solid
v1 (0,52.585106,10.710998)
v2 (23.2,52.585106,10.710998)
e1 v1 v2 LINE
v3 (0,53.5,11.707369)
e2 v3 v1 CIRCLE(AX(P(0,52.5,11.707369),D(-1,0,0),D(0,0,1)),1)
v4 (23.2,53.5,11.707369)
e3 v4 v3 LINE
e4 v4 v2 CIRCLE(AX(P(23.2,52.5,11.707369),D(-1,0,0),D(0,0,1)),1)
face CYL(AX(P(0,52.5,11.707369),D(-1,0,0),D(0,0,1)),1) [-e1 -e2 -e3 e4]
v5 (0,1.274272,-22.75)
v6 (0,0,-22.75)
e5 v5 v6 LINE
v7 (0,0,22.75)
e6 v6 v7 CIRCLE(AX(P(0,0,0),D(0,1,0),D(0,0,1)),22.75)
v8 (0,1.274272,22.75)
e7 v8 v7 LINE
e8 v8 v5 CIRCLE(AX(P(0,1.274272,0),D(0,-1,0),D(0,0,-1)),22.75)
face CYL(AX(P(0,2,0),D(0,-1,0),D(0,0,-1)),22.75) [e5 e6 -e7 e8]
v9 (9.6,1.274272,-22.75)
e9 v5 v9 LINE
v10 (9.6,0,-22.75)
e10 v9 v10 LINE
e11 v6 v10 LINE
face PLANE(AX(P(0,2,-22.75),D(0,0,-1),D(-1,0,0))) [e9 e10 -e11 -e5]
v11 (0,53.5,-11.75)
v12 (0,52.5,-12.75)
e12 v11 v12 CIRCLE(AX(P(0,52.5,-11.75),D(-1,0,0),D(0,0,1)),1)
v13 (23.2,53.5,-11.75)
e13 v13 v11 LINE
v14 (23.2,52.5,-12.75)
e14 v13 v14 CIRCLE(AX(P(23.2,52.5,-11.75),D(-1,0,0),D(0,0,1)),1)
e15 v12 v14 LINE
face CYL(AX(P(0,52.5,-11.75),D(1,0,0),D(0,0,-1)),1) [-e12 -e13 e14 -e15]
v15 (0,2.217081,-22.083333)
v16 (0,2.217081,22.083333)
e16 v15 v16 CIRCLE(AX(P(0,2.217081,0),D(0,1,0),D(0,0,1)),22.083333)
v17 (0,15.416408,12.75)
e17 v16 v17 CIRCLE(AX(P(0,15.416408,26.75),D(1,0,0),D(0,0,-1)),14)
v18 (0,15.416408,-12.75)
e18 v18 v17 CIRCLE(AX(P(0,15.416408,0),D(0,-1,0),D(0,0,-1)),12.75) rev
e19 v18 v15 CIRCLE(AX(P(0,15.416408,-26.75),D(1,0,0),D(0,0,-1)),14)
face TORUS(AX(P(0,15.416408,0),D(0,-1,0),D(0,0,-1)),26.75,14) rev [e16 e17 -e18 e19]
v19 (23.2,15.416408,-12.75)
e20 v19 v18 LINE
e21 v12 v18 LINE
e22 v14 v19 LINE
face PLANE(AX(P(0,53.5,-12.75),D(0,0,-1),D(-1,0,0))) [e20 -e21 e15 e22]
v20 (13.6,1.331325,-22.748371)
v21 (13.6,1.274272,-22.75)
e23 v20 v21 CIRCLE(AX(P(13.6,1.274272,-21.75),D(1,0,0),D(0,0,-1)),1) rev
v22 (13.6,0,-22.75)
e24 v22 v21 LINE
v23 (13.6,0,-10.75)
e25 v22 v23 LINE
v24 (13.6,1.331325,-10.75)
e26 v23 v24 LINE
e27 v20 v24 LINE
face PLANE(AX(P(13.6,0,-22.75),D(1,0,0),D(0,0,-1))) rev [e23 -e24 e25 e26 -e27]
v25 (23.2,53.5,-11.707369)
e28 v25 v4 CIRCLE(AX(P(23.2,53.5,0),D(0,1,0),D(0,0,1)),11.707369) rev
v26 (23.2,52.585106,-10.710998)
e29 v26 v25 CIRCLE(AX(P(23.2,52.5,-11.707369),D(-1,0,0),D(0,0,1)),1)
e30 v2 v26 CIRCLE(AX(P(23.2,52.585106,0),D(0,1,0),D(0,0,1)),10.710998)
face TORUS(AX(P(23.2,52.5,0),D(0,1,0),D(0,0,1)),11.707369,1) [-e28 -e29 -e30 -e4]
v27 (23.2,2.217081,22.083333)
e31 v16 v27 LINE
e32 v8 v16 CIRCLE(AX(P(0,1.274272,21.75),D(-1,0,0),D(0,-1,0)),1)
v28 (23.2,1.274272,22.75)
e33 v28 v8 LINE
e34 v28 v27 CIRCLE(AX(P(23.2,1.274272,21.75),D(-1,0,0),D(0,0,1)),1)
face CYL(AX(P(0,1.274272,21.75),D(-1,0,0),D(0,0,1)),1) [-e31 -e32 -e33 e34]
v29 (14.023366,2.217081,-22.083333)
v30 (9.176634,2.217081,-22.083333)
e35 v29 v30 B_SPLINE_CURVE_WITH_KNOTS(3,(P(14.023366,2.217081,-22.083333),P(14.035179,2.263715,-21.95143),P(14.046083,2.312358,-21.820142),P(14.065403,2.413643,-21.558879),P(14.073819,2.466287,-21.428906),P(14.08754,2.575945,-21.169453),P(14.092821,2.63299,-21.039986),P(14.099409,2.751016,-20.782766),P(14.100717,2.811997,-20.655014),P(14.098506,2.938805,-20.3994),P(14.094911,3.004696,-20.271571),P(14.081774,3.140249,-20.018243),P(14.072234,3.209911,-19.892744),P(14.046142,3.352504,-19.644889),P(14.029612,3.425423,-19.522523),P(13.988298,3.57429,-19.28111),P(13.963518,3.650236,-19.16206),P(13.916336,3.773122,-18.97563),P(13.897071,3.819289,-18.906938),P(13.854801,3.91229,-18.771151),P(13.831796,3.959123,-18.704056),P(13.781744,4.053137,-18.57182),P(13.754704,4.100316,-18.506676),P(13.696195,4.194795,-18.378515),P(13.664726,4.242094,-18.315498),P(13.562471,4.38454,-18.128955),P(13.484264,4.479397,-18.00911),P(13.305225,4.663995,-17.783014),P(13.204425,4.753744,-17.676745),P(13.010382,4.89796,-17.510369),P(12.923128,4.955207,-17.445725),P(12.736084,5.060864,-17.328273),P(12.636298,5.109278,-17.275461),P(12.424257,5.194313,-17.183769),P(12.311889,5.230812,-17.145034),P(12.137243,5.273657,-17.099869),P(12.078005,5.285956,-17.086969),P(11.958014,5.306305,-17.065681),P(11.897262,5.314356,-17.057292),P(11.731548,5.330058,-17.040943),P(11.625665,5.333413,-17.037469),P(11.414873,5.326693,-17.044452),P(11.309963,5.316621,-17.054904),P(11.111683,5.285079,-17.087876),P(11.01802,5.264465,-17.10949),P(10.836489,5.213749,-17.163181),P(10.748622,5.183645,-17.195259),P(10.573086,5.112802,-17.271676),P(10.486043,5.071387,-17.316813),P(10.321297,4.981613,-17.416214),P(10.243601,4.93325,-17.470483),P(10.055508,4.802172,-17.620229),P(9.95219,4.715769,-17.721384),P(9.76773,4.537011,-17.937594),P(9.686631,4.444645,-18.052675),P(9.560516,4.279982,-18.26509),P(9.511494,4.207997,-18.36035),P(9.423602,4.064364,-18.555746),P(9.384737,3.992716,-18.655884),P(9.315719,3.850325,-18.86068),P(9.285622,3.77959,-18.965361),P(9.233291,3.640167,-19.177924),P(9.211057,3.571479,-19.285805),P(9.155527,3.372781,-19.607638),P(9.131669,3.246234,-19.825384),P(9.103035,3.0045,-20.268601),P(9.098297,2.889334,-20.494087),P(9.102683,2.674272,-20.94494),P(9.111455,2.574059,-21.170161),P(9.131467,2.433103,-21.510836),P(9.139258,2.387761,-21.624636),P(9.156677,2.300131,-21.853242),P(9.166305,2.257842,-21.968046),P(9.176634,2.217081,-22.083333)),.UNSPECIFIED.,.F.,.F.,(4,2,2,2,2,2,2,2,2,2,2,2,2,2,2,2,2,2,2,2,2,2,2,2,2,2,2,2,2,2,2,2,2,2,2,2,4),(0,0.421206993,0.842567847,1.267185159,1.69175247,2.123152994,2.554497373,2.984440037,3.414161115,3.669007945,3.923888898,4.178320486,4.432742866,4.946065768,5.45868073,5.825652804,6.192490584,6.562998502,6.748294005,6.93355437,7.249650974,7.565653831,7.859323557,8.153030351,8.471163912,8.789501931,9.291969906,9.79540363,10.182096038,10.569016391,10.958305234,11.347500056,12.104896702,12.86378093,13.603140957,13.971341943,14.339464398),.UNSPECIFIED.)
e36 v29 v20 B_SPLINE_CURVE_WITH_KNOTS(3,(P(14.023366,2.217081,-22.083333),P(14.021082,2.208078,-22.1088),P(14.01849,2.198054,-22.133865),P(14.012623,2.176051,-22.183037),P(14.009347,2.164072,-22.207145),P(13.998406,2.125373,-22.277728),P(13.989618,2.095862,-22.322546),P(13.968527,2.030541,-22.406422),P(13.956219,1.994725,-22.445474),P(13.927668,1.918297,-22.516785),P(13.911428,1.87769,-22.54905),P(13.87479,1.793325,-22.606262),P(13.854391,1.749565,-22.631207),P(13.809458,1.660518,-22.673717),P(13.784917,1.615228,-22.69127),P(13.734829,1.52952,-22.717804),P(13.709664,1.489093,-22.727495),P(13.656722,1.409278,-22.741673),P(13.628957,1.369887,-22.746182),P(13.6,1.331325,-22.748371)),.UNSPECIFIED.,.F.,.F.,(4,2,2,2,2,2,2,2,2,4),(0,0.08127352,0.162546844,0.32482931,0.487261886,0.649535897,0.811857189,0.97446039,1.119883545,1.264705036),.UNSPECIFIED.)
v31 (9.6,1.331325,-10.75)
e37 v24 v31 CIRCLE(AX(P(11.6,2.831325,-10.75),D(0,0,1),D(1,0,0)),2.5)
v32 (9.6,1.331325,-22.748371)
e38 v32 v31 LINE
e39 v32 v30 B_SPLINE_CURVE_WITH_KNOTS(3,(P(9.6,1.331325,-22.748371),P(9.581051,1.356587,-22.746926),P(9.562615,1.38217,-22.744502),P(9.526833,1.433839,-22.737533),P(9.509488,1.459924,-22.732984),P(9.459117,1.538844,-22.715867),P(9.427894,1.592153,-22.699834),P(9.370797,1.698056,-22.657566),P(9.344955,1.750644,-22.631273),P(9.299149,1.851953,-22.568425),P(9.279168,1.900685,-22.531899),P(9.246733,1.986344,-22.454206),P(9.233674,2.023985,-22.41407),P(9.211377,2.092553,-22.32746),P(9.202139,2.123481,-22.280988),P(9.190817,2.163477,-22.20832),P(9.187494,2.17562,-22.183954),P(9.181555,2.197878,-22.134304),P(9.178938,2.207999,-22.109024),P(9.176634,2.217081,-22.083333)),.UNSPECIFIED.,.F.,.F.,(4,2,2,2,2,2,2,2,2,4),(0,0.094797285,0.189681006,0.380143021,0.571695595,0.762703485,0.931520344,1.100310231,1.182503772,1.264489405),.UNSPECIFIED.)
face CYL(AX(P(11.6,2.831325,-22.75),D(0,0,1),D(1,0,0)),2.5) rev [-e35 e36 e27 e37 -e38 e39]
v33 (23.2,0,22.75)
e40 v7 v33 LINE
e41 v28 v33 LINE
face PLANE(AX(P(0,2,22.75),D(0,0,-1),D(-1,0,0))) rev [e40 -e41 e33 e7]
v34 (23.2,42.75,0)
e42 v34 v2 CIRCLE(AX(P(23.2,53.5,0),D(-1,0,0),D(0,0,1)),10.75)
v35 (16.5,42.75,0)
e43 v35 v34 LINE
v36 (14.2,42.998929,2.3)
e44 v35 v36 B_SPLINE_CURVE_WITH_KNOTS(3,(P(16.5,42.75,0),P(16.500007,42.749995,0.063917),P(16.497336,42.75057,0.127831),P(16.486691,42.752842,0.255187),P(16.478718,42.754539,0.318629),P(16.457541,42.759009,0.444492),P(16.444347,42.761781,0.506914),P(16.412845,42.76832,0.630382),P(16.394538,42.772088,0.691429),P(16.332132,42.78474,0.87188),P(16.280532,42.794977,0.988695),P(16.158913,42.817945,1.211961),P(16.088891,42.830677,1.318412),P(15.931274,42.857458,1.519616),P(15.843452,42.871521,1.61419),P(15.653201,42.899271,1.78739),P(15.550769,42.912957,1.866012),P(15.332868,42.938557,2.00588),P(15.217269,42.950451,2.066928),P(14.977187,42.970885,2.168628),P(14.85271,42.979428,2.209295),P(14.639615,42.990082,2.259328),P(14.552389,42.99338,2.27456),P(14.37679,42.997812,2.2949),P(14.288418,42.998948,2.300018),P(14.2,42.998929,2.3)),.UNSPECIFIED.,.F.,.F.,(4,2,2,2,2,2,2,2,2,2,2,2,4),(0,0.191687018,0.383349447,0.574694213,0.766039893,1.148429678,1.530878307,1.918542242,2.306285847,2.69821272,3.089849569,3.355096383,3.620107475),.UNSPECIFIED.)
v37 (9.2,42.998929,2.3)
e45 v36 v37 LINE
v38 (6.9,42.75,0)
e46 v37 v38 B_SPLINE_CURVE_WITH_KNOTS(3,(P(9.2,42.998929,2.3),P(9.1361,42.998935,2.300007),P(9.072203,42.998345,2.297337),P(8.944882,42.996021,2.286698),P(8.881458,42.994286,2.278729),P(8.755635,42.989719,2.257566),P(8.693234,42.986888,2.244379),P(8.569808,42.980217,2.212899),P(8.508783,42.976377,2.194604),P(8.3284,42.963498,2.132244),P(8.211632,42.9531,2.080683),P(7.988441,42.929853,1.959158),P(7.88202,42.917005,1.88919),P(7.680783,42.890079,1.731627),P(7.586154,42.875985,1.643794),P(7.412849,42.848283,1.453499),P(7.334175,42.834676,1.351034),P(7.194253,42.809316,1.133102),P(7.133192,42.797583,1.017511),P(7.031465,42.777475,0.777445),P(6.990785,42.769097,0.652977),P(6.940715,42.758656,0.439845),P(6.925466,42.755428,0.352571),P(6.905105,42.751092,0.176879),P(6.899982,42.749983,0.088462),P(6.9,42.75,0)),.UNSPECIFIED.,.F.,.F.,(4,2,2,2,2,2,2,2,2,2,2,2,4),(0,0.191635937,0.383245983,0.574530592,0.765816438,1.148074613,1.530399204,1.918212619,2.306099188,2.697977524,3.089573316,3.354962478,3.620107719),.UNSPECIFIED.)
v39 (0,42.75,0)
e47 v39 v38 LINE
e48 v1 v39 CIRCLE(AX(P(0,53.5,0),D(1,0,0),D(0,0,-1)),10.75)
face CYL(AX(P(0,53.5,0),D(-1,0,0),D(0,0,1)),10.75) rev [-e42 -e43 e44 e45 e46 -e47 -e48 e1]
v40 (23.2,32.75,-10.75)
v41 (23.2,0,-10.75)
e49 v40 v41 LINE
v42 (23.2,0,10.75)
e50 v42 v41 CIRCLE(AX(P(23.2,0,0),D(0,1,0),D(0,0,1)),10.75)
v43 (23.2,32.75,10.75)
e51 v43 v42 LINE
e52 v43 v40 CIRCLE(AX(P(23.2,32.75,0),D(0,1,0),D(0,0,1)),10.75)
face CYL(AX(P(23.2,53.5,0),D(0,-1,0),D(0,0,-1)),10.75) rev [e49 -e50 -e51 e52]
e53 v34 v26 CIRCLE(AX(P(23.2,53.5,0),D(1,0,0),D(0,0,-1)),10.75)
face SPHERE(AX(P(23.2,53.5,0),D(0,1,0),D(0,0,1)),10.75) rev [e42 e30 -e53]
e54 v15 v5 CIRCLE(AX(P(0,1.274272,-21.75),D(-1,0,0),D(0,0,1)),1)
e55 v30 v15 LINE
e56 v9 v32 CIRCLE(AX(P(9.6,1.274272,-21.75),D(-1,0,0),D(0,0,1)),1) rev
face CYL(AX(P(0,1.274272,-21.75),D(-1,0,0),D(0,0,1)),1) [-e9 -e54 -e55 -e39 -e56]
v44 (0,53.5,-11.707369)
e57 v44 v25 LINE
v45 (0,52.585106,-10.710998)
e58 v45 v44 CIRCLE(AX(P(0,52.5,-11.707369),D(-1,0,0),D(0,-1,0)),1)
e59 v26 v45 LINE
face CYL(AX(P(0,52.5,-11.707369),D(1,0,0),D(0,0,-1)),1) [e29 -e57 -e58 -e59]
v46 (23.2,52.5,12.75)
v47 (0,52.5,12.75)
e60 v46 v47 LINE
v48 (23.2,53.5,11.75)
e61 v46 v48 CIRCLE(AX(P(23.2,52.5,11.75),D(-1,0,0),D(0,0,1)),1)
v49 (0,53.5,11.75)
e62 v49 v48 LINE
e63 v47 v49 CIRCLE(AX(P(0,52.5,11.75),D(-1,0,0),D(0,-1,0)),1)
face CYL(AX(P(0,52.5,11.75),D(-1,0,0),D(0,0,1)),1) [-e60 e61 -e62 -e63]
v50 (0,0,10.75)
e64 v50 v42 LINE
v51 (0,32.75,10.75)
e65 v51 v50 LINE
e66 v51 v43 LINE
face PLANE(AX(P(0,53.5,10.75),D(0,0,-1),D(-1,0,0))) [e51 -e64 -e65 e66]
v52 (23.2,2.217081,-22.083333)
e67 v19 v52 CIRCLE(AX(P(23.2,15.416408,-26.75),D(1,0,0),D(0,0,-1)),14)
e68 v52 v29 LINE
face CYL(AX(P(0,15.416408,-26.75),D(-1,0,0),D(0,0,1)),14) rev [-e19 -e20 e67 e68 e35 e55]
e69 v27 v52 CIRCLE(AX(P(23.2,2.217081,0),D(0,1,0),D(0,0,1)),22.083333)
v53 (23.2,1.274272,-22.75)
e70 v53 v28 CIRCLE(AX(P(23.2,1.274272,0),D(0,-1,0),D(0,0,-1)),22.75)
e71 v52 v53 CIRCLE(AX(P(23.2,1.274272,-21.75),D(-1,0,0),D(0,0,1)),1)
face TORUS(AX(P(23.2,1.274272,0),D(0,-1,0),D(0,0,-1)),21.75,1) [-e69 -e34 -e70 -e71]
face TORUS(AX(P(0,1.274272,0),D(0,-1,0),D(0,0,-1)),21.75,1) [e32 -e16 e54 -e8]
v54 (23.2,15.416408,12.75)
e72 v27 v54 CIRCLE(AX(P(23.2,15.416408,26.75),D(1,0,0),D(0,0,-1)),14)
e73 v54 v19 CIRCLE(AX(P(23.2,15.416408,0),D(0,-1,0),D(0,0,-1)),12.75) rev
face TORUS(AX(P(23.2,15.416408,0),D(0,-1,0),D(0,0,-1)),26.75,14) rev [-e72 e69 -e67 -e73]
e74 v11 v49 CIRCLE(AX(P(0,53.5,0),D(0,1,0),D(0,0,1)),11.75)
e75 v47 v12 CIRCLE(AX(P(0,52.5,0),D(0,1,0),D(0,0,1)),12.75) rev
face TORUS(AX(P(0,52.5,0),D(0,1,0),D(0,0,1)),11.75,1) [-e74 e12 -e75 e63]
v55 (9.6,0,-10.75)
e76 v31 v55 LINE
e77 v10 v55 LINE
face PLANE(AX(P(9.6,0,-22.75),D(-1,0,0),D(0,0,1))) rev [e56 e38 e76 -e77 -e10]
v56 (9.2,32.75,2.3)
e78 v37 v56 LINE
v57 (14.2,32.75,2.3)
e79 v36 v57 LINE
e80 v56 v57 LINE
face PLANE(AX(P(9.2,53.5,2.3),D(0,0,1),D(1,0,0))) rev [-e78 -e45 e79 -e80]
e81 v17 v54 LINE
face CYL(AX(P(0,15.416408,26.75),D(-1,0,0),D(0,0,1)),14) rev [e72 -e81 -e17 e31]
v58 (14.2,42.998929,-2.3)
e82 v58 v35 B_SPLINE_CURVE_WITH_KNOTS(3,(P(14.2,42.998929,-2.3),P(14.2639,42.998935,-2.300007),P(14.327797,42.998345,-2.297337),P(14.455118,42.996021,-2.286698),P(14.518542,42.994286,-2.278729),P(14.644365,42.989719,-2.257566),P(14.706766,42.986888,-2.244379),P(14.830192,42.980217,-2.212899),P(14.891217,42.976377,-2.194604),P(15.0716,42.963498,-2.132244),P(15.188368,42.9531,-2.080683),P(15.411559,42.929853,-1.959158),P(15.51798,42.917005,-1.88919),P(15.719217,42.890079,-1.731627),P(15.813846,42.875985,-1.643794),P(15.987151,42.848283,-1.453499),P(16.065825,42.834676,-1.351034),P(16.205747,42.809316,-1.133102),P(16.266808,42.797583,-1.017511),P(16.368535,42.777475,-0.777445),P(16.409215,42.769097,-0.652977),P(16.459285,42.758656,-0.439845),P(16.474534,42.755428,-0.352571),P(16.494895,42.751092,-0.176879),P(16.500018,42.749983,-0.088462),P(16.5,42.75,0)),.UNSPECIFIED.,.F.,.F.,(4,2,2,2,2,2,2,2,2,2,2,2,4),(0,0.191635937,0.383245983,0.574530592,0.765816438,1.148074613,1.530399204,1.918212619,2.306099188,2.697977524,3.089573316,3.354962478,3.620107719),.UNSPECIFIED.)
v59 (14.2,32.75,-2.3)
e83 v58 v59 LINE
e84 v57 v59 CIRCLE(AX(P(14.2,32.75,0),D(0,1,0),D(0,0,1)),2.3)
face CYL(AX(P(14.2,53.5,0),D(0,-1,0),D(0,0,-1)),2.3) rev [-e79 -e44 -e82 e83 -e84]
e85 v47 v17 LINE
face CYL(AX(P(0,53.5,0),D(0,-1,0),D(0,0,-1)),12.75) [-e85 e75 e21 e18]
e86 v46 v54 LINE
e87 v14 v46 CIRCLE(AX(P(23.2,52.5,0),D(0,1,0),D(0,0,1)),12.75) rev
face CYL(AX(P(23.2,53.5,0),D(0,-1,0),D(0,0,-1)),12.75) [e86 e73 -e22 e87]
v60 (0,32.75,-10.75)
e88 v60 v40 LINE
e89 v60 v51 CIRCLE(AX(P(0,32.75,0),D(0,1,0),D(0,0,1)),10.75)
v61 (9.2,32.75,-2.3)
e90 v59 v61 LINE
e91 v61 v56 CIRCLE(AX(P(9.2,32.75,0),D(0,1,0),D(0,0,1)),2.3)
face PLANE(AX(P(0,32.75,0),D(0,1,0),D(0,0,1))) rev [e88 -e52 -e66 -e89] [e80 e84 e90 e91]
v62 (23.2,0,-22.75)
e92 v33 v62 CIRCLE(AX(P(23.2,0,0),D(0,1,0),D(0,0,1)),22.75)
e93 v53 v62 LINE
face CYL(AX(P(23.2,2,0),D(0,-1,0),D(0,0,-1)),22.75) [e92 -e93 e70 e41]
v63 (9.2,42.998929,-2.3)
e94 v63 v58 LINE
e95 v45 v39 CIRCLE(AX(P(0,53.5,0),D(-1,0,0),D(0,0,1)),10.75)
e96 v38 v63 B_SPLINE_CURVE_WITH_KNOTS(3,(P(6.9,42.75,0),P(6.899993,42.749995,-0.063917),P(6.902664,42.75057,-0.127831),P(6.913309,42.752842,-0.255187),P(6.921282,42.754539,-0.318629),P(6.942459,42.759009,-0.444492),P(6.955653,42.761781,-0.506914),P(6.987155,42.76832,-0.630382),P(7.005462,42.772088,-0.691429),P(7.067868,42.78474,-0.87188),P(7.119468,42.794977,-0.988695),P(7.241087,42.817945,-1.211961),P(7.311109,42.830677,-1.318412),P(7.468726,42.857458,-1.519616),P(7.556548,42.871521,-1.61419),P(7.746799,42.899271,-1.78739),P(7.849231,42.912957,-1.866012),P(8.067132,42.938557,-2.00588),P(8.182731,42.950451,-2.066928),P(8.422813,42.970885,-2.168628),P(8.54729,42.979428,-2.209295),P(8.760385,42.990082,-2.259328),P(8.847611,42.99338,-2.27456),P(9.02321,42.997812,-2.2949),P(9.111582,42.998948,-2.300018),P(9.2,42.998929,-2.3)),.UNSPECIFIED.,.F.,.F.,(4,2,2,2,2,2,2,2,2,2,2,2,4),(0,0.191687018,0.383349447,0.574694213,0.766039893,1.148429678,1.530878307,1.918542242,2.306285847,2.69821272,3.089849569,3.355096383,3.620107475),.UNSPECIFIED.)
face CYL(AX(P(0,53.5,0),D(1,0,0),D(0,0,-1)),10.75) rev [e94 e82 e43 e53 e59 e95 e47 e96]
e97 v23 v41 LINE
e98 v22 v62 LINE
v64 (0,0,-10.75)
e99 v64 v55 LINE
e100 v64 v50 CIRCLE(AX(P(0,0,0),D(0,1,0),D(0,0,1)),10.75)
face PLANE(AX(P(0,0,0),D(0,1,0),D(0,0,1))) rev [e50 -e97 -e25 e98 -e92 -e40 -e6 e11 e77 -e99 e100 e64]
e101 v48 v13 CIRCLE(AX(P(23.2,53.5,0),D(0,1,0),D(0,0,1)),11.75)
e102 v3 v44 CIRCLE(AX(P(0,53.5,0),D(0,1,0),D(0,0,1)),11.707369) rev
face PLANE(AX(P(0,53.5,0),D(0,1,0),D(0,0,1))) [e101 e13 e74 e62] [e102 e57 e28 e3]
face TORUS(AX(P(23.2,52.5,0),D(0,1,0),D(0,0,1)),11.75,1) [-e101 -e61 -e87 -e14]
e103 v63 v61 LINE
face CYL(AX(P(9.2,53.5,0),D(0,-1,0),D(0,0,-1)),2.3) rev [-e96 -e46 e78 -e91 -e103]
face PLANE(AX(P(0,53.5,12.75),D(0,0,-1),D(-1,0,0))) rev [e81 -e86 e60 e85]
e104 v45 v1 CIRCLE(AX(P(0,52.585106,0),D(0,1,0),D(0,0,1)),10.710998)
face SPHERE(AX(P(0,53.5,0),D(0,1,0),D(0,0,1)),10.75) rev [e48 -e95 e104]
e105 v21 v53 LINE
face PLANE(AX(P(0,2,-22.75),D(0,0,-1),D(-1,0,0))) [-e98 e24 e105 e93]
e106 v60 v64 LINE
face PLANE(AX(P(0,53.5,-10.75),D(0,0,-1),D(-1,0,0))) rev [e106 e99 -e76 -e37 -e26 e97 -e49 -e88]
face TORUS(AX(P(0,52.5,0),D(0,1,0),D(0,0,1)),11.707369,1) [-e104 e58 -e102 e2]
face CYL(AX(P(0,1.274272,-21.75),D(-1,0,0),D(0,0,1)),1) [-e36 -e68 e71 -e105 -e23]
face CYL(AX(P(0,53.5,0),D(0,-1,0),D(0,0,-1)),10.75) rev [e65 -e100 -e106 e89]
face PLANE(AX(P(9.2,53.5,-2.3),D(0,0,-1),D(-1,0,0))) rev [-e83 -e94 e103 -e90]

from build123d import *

# Parameters (mm, degrees)
BOSS_EXTRUDE1_DEPTH     = 53.5
BOSS_EXTRUDE2_START     = 32.75
BOSS_EXTRUDE2_DEPTH     = 10
BOSS_EXTRUDE3_DEPTH     = 2
FILLET1_R               = 10.75
FILLET2_R               = 14
FILLET3_R               = 1
CUT_EXTRUDE4_DEPTH      = 79.076260797
CUT_EXTRUDE5_DEPTH      = 61.840180017
CUT_EXTRUDE5_DEPTH_BACK = 61.840180017


# Some blends are built 0.0001 mm under size
with BuildPart() as part:
    # Sketch2 → Boss-Extrude1 (new body)
    with BuildSketch(Plane(origin=(0, 0, 0), x_dir=(1, 0, 0), z_dir=(0, 1, 0))):
        with BuildLine():
            Line((0, -12.75), (23.2, -12.75))
            ThreePointArc((23.2, -12.75), (35.95, 0), (23.2, 12.75))
            Line((23.2, 12.75), (0, 12.75))
            ThreePointArc((0, 12.75), (-12.75, 0), (0, -12.75))
        make_face()
        with BuildLine():
            ThreePointArc((23.2, -10.75), (33.95, 0), (23.2, 10.75))
            Line((23.2, 10.75), (0, 10.75))
            ThreePointArc((0, 10.75), (-10.75, 0), (0, -10.75))
            Line((0, -10.75), (23.2, -10.75))
        make_face(mode=Mode.SUBTRACT)
    extrude(amount=BOSS_EXTRUDE1_DEPTH)

    # Sketch2<3> → Boss-Extrude2 (add)
    with BuildSketch(Plane(origin=(0, 0, 0), x_dir=(1, 0, 0), z_dir=(0, 1, 0)).offset(BOSS_EXTRUDE2_START)):
        with BuildLine():
            Line((0, -10.75), (23.2, -10.75))
            ThreePointArc((23.2, -10.75), (33.95, 0), (23.2, 10.75))
            Line((23.2, 10.75), (0, 10.75))
            ThreePointArc((0, 10.75), (-10.75, 0), (0, -10.75))
        make_face()
    extrude(amount=BOSS_EXTRUDE2_DEPTH)

    # Sketch2<4> → Boss-Extrude3 (add)
    with BuildSketch(Plane(origin=(0, 0, 0), x_dir=(1, 0, 0), z_dir=(0, 1, 0))):
        with BuildLine():
            Line((0, 22.75), (23.2, 22.75))
            ThreePointArc((23.2, 22.75), (45.95, 0), (23.2, -22.75))
            Line((23.2, -22.75), (0, -22.75))
            ThreePointArc((0, -22.75), (-22.75, 0), (0, 22.75))
        make_face()
        with BuildLine():
            ThreePointArc((23.2, -12.75), (35.95, 0), (23.2, 12.75))
            Line((23.2, 12.75), (0, 12.75))
            ThreePointArc((0, 12.75), (-12.75, 0), (0, -12.75))
            Line((0, -12.75), (23.2, -12.75))
        make_face(mode=Mode.SUBTRACT)
    extrude(amount=BOSS_EXTRUDE3_DEPTH)

    # Fillet1
    fillet1_edges = [part.edges().sort_by_distance(p)[0] for p in [
        (11.6, 42.75, -10.75),
        (33.95, 42.75, 0),
        (11.6, 42.75, 10.75),
        (-10.75, 42.75, 0),
    ]]
    fillet(fillet1_edges, radius=FILLET1_R - 0.0001)  # a hair under: the kernel refuses the full size

    # Fillet2
    # the kernel refuses this fillet: 14 mm, written as the material it adds along each edge
    with BuildSketch(Plane(origin=(23.2, 2, 0), x_dir=(0, 0, 1), z_dir=(-1, 0, 0))) as fillet2_piece_1:
        with BuildLine():
            CenterArc((26.75, 13.416407865), FILLET2_R, 180, 73.398450401)
            Line((22.75, 0), (22.67, -0.268328157))
            ThreePointArc((22.67, -0.268328157), (17.75, -0.28), (12.75, -0.28))
            Line((12.75, -0.28), (12.47, 0))
            Line((12.47, 0), (12.47, 13.416407865))
            Line((12.47, 13.416407865), (12.75, 13.416407865))
        make_face()
    revolve(axis=Axis((23.2, 2, 0), (0, 1, 0)), revolution_arc=180)
    with BuildSketch(Plane(origin=(0, 2, 12.75), x_dir=(0, 1, 0), z_dir=(1, 0, 0)), Plane(origin=(23.2, 2, -12.75), x_dir=(0, 1, 0), z_dir=(-1, 0, 0))) as fillet2_piece_2:
        with BuildLine():
            CenterArc((13.416407865, 14), FILLET2_R, 196.601549599, 73.398450401)
            Line((0, 10), (-0.268328157, 9.92))
            ThreePointArc((-0.268328157, 9.92), (-0.28, 5), (-0.28, 0))
            Line((-0.28, 0), (0, -0.28))
            Line((0, -0.28), (13.416407865, -0.28))
            Line((13.416407865, -0.28), (13.416407865, 0))
        make_face()
    extrude(amount=23.2)
    with BuildSketch(Plane(origin=(0, 2, 0), x_dir=(0, 0, -1), z_dir=(1, 0, 0))) as fillet2_piece_3:
        with BuildLine():
            CenterArc((26.75, 13.416407865), FILLET2_R, 180, 73.398450401)
            Line((22.75, 0), (22.67, -0.268328157))
            ThreePointArc((22.67, -0.268328157), (17.75, -0.28), (12.75, -0.28))
            Line((12.75, -0.28), (12.47, 0))
            Line((12.47, 0), (12.47, 13.416407865))
            Line((12.47, 13.416407865), (12.75, 13.416407865))
        make_face()
    revolve(axis=Axis((0, 2, 0), (0, 1, 0)), revolution_arc=180)

    # Fillet3
    # the kernel refuses this fillet: 1 mm, written as the material it takes off along each edge
    with BuildSketch(Plane(origin=(0, 53.5, 10.75), x_dir=(0, 0, 1), z_dir=(1, 0, 0)), Plane(origin=(23.2, 53.5, -10.75), x_dir=(0, 0, -1), z_dir=(-1, 0, 0))) as fillet3_piece_1:
        with BuildLine():
            CenterArc((0.957377651, 1), FILLET3_R, 184.881694581, 85.118305419)
            Line((-0.038994884, 0.914901403), (-0.138632138, 0.906391544))
            ThreePointArc((-0.138632138, 0.906391544), (-0.1, 0.0001), (-0.1, 0))
            Line((-0.1, 0), (0, -0.1))
            Line((0, -0.1), (0.957377651, -0.1))
            Line((0.957377651, -0.1), (0.957377651, 0))
        make_face()
    extrude(amount=23.2, mode=Mode.SUBTRACT)
    with BuildSketch(Plane(origin=(0, 53.5, 0), x_dir=(0, 0, -1), z_dir=(1, 0, 0))) as fillet3_piece_2:
        with BuildLine():
            CenterArc((11.707377651, -1), FILLET3_R, 90, 85.118305419)
            Line((10.711005116, -0.914901403), (10.611367862, -0.906391544))
            ThreePointArc((10.611367862, -0.906391544), (10.65, -0.0001), (10.65, 0))
            Line((10.65, 0), (10.75, 0.1))
            Line((10.75, 0.1), (11.707377651, 0.1))
            Line((11.707377651, 0.1), (11.707377651, 0))
        make_face()
    revolve(axis=Axis((0, 53.5, 0), (0, 1, 0)), revolution_arc=180, mode=Mode.SUBTRACT)
    with BuildSketch(Plane(origin=(0, 53.5, 12.75), x_dir=(0, -1, 0), z_dir=(1, 0, 0))) as fillet3_piece_3:
        with BuildLine():
            CenterArc((FILLET3_R, FILLET3_R), FILLET3_R, 180, 90)
            Line((0, FILLET3_R), (0, 0))
            Line((0, 0), (FILLET3_R, 0))
        make_face()
    extrude(amount=23.2, mode=Mode.SUBTRACT)
    with BuildSketch(Plane(origin=(23.2, 53.5, 0), x_dir=(0, 0, 1), z_dir=(-1, 0, 0))) as fillet3_piece_4:
        with BuildLine():
            CenterArc((12.75 - FILLET3_R, -FILLET3_R), FILLET3_R, 0, 90)
            Line((12.75, -FILLET3_R), (12.75, 0))
            Line((12.75, 0), (12.75 - FILLET3_R, 0))
        make_face()
    revolve(axis=Axis((23.2, 53.5, 0), (0, 1, 0)), revolution_arc=180, mode=Mode.SUBTRACT)
    with BuildSketch(Plane(origin=(23.2, 53.5, -12.75), x_dir=(0, 0, 1), z_dir=(-1, 0, 0))) as fillet3_piece_5:
        with BuildLine():
            CenterArc((FILLET3_R, -FILLET3_R), FILLET3_R, 90, 90)
            Line((0, -FILLET3_R), (0, 0))
            Line((0, 0), (FILLET3_R, 0))
        make_face()
    extrude(amount=23.2, mode=Mode.SUBTRACT)
    with BuildSketch(Plane(origin=(0, 53.5, 0), x_dir=(0, 0, -1), z_dir=(1, 0, 0))) as fillet3_piece_6:
        with BuildLine():
            CenterArc((12.75 - FILLET3_R, -FILLET3_R), FILLET3_R, 0, 90)
            Line((12.75 - FILLET3_R, 0), (12.75, 0))
            Line((12.75, 0), (12.75, -FILLET3_R))
        make_face()
    revolve(axis=Axis((0, 53.5, 0), (0, 1, 0)), revolution_arc=180, mode=Mode.SUBTRACT)
    with BuildSketch(Plane(origin=(0, 2, -22.75), x_dir=(0, 0.30962089103713925, 0.9508600863604318), z_dir=(1, 0, 0)), Plane(origin=(23.2, 2, 22.75), x_dir=(0, 0.30962089103713925, -0.9508600863604318), z_dir=(-1, 0, 0))) as fillet3_piece_7:
        with BuildLine():
            CenterArc((0.726159611, 0.99968645), FILLET3_R, 198.036385117, 70.528779366)
            Line((-0.224700475, 0.690065559), (0, 0))
            ThreePointArc((0, 0), (0.350559812, 0.004389695), (0.701119624, 0))
        make_face()
    extrude(amount=23.2, mode=Mode.SUBTRACT)
    with BuildSketch(Plane(origin=(0, 2, 0), x_dir=(0, 0, 1), z_dir=(1, 0, 0))) as fillet3_piece_8:
        with BuildLine():
            CenterArc((21.75, 0.725727759), FILLET3_R, 289.471220634, 70.528779366)
            Line((22.75, 0.725727759), (22.75, 0))
            ThreePointArc((22.75, 0), (22.415307525, -0.104366656), (22.083333333, -0.217081283))
        make_face()
    revolve(axis=Axis((0, 2, 0), (0, -1, 0)), revolution_arc=180, mode=Mode.SUBTRACT)
    with BuildSketch(Plane(origin=(23.2, 2, 0), x_dir=(0, 0, -1), z_dir=(-1, 0, 0))) as fillet3_piece_9:
        with BuildLine():
            CenterArc((21.75, 0.725727759), FILLET3_R, 289.471220634, 70.528779366)
            Line((22.75, 0.725727759), (22.75, 0))
            ThreePointArc((22.75, 0), (22.415307525, -0.104366656), (22.083333333, -0.217081283))
        make_face()
    revolve(axis=Axis((23.2, 2, 0), (0, -1, 0)), revolution_arc=180, mode=Mode.SUBTRACT)
    with BuildSketch(Plane(origin=(23.2, 53.5, 0), x_dir=(0, 0, 1), z_dir=(-1, 0, 0))) as fillet3_piece_10:
        with BuildLine():
            CenterArc((11.707377651, -1), FILLET3_R, 90, 85.118305419)
            Line((10.711005116, -0.914901403), (10.611367862, -0.906391544))
            ThreePointArc((10.611367862, -0.906391544), (10.65, -0.0001), (10.65, 0))
            Line((10.65, 0), (10.75, 0.1))
            Line((10.75, 0.1), (11.707377651, 0.1))
            Line((11.707377651, 0.1), (11.707377651, 0))
        make_face()
    revolve(axis=Axis((23.2, 53.5, 0), (0, 1, 0)), revolution_arc=180, mode=Mode.SUBTRACT)

    # Sketch4 → Cut-Extrude4 (cut, through all)
    with BuildSketch(Plane.XY.offset(-10.75)):
        with BuildLine():
            Line((13.6, 0), (9.6, 0))
            Line((9.6, 0), (9.6, 1.331324862))
            ThreePointArc((9.6, 1.331324862), (11.6, 5.331324862), (13.6, 1.331324862))
            Line((13.6, 1.331324862), (13.6, 0))
        make_face()
    extrude(amount=-CUT_EXTRUDE4_DEPTH, mode=Mode.SUBTRACT)

    # Sketch3 → Cut-Extrude5 (cut, two sides: drawn at the far end of the back side and taken through both)
    with BuildSketch(Plane.XZ.offset(-32.75).offset(-CUT_EXTRUDE5_DEPTH_BACK)):
        with BuildLine():
            Line((9.2, 2.3), (14.2, 2.3))
            ThreePointArc((14.2, 2.3), (16.5, 0), (14.2, -2.3))
            Line((14.2, -2.3), (9.2, -2.3))
            ThreePointArc((9.2, -2.3), (6.9, 0), (9.2, 2.3))
        make_face()
    extrude(amount=CUT_EXTRUDE5_DEPTH + CUT_EXTRUDE5_DEPTH_BACK, mode=Mode.SUBTRACT)


solid = part.part
